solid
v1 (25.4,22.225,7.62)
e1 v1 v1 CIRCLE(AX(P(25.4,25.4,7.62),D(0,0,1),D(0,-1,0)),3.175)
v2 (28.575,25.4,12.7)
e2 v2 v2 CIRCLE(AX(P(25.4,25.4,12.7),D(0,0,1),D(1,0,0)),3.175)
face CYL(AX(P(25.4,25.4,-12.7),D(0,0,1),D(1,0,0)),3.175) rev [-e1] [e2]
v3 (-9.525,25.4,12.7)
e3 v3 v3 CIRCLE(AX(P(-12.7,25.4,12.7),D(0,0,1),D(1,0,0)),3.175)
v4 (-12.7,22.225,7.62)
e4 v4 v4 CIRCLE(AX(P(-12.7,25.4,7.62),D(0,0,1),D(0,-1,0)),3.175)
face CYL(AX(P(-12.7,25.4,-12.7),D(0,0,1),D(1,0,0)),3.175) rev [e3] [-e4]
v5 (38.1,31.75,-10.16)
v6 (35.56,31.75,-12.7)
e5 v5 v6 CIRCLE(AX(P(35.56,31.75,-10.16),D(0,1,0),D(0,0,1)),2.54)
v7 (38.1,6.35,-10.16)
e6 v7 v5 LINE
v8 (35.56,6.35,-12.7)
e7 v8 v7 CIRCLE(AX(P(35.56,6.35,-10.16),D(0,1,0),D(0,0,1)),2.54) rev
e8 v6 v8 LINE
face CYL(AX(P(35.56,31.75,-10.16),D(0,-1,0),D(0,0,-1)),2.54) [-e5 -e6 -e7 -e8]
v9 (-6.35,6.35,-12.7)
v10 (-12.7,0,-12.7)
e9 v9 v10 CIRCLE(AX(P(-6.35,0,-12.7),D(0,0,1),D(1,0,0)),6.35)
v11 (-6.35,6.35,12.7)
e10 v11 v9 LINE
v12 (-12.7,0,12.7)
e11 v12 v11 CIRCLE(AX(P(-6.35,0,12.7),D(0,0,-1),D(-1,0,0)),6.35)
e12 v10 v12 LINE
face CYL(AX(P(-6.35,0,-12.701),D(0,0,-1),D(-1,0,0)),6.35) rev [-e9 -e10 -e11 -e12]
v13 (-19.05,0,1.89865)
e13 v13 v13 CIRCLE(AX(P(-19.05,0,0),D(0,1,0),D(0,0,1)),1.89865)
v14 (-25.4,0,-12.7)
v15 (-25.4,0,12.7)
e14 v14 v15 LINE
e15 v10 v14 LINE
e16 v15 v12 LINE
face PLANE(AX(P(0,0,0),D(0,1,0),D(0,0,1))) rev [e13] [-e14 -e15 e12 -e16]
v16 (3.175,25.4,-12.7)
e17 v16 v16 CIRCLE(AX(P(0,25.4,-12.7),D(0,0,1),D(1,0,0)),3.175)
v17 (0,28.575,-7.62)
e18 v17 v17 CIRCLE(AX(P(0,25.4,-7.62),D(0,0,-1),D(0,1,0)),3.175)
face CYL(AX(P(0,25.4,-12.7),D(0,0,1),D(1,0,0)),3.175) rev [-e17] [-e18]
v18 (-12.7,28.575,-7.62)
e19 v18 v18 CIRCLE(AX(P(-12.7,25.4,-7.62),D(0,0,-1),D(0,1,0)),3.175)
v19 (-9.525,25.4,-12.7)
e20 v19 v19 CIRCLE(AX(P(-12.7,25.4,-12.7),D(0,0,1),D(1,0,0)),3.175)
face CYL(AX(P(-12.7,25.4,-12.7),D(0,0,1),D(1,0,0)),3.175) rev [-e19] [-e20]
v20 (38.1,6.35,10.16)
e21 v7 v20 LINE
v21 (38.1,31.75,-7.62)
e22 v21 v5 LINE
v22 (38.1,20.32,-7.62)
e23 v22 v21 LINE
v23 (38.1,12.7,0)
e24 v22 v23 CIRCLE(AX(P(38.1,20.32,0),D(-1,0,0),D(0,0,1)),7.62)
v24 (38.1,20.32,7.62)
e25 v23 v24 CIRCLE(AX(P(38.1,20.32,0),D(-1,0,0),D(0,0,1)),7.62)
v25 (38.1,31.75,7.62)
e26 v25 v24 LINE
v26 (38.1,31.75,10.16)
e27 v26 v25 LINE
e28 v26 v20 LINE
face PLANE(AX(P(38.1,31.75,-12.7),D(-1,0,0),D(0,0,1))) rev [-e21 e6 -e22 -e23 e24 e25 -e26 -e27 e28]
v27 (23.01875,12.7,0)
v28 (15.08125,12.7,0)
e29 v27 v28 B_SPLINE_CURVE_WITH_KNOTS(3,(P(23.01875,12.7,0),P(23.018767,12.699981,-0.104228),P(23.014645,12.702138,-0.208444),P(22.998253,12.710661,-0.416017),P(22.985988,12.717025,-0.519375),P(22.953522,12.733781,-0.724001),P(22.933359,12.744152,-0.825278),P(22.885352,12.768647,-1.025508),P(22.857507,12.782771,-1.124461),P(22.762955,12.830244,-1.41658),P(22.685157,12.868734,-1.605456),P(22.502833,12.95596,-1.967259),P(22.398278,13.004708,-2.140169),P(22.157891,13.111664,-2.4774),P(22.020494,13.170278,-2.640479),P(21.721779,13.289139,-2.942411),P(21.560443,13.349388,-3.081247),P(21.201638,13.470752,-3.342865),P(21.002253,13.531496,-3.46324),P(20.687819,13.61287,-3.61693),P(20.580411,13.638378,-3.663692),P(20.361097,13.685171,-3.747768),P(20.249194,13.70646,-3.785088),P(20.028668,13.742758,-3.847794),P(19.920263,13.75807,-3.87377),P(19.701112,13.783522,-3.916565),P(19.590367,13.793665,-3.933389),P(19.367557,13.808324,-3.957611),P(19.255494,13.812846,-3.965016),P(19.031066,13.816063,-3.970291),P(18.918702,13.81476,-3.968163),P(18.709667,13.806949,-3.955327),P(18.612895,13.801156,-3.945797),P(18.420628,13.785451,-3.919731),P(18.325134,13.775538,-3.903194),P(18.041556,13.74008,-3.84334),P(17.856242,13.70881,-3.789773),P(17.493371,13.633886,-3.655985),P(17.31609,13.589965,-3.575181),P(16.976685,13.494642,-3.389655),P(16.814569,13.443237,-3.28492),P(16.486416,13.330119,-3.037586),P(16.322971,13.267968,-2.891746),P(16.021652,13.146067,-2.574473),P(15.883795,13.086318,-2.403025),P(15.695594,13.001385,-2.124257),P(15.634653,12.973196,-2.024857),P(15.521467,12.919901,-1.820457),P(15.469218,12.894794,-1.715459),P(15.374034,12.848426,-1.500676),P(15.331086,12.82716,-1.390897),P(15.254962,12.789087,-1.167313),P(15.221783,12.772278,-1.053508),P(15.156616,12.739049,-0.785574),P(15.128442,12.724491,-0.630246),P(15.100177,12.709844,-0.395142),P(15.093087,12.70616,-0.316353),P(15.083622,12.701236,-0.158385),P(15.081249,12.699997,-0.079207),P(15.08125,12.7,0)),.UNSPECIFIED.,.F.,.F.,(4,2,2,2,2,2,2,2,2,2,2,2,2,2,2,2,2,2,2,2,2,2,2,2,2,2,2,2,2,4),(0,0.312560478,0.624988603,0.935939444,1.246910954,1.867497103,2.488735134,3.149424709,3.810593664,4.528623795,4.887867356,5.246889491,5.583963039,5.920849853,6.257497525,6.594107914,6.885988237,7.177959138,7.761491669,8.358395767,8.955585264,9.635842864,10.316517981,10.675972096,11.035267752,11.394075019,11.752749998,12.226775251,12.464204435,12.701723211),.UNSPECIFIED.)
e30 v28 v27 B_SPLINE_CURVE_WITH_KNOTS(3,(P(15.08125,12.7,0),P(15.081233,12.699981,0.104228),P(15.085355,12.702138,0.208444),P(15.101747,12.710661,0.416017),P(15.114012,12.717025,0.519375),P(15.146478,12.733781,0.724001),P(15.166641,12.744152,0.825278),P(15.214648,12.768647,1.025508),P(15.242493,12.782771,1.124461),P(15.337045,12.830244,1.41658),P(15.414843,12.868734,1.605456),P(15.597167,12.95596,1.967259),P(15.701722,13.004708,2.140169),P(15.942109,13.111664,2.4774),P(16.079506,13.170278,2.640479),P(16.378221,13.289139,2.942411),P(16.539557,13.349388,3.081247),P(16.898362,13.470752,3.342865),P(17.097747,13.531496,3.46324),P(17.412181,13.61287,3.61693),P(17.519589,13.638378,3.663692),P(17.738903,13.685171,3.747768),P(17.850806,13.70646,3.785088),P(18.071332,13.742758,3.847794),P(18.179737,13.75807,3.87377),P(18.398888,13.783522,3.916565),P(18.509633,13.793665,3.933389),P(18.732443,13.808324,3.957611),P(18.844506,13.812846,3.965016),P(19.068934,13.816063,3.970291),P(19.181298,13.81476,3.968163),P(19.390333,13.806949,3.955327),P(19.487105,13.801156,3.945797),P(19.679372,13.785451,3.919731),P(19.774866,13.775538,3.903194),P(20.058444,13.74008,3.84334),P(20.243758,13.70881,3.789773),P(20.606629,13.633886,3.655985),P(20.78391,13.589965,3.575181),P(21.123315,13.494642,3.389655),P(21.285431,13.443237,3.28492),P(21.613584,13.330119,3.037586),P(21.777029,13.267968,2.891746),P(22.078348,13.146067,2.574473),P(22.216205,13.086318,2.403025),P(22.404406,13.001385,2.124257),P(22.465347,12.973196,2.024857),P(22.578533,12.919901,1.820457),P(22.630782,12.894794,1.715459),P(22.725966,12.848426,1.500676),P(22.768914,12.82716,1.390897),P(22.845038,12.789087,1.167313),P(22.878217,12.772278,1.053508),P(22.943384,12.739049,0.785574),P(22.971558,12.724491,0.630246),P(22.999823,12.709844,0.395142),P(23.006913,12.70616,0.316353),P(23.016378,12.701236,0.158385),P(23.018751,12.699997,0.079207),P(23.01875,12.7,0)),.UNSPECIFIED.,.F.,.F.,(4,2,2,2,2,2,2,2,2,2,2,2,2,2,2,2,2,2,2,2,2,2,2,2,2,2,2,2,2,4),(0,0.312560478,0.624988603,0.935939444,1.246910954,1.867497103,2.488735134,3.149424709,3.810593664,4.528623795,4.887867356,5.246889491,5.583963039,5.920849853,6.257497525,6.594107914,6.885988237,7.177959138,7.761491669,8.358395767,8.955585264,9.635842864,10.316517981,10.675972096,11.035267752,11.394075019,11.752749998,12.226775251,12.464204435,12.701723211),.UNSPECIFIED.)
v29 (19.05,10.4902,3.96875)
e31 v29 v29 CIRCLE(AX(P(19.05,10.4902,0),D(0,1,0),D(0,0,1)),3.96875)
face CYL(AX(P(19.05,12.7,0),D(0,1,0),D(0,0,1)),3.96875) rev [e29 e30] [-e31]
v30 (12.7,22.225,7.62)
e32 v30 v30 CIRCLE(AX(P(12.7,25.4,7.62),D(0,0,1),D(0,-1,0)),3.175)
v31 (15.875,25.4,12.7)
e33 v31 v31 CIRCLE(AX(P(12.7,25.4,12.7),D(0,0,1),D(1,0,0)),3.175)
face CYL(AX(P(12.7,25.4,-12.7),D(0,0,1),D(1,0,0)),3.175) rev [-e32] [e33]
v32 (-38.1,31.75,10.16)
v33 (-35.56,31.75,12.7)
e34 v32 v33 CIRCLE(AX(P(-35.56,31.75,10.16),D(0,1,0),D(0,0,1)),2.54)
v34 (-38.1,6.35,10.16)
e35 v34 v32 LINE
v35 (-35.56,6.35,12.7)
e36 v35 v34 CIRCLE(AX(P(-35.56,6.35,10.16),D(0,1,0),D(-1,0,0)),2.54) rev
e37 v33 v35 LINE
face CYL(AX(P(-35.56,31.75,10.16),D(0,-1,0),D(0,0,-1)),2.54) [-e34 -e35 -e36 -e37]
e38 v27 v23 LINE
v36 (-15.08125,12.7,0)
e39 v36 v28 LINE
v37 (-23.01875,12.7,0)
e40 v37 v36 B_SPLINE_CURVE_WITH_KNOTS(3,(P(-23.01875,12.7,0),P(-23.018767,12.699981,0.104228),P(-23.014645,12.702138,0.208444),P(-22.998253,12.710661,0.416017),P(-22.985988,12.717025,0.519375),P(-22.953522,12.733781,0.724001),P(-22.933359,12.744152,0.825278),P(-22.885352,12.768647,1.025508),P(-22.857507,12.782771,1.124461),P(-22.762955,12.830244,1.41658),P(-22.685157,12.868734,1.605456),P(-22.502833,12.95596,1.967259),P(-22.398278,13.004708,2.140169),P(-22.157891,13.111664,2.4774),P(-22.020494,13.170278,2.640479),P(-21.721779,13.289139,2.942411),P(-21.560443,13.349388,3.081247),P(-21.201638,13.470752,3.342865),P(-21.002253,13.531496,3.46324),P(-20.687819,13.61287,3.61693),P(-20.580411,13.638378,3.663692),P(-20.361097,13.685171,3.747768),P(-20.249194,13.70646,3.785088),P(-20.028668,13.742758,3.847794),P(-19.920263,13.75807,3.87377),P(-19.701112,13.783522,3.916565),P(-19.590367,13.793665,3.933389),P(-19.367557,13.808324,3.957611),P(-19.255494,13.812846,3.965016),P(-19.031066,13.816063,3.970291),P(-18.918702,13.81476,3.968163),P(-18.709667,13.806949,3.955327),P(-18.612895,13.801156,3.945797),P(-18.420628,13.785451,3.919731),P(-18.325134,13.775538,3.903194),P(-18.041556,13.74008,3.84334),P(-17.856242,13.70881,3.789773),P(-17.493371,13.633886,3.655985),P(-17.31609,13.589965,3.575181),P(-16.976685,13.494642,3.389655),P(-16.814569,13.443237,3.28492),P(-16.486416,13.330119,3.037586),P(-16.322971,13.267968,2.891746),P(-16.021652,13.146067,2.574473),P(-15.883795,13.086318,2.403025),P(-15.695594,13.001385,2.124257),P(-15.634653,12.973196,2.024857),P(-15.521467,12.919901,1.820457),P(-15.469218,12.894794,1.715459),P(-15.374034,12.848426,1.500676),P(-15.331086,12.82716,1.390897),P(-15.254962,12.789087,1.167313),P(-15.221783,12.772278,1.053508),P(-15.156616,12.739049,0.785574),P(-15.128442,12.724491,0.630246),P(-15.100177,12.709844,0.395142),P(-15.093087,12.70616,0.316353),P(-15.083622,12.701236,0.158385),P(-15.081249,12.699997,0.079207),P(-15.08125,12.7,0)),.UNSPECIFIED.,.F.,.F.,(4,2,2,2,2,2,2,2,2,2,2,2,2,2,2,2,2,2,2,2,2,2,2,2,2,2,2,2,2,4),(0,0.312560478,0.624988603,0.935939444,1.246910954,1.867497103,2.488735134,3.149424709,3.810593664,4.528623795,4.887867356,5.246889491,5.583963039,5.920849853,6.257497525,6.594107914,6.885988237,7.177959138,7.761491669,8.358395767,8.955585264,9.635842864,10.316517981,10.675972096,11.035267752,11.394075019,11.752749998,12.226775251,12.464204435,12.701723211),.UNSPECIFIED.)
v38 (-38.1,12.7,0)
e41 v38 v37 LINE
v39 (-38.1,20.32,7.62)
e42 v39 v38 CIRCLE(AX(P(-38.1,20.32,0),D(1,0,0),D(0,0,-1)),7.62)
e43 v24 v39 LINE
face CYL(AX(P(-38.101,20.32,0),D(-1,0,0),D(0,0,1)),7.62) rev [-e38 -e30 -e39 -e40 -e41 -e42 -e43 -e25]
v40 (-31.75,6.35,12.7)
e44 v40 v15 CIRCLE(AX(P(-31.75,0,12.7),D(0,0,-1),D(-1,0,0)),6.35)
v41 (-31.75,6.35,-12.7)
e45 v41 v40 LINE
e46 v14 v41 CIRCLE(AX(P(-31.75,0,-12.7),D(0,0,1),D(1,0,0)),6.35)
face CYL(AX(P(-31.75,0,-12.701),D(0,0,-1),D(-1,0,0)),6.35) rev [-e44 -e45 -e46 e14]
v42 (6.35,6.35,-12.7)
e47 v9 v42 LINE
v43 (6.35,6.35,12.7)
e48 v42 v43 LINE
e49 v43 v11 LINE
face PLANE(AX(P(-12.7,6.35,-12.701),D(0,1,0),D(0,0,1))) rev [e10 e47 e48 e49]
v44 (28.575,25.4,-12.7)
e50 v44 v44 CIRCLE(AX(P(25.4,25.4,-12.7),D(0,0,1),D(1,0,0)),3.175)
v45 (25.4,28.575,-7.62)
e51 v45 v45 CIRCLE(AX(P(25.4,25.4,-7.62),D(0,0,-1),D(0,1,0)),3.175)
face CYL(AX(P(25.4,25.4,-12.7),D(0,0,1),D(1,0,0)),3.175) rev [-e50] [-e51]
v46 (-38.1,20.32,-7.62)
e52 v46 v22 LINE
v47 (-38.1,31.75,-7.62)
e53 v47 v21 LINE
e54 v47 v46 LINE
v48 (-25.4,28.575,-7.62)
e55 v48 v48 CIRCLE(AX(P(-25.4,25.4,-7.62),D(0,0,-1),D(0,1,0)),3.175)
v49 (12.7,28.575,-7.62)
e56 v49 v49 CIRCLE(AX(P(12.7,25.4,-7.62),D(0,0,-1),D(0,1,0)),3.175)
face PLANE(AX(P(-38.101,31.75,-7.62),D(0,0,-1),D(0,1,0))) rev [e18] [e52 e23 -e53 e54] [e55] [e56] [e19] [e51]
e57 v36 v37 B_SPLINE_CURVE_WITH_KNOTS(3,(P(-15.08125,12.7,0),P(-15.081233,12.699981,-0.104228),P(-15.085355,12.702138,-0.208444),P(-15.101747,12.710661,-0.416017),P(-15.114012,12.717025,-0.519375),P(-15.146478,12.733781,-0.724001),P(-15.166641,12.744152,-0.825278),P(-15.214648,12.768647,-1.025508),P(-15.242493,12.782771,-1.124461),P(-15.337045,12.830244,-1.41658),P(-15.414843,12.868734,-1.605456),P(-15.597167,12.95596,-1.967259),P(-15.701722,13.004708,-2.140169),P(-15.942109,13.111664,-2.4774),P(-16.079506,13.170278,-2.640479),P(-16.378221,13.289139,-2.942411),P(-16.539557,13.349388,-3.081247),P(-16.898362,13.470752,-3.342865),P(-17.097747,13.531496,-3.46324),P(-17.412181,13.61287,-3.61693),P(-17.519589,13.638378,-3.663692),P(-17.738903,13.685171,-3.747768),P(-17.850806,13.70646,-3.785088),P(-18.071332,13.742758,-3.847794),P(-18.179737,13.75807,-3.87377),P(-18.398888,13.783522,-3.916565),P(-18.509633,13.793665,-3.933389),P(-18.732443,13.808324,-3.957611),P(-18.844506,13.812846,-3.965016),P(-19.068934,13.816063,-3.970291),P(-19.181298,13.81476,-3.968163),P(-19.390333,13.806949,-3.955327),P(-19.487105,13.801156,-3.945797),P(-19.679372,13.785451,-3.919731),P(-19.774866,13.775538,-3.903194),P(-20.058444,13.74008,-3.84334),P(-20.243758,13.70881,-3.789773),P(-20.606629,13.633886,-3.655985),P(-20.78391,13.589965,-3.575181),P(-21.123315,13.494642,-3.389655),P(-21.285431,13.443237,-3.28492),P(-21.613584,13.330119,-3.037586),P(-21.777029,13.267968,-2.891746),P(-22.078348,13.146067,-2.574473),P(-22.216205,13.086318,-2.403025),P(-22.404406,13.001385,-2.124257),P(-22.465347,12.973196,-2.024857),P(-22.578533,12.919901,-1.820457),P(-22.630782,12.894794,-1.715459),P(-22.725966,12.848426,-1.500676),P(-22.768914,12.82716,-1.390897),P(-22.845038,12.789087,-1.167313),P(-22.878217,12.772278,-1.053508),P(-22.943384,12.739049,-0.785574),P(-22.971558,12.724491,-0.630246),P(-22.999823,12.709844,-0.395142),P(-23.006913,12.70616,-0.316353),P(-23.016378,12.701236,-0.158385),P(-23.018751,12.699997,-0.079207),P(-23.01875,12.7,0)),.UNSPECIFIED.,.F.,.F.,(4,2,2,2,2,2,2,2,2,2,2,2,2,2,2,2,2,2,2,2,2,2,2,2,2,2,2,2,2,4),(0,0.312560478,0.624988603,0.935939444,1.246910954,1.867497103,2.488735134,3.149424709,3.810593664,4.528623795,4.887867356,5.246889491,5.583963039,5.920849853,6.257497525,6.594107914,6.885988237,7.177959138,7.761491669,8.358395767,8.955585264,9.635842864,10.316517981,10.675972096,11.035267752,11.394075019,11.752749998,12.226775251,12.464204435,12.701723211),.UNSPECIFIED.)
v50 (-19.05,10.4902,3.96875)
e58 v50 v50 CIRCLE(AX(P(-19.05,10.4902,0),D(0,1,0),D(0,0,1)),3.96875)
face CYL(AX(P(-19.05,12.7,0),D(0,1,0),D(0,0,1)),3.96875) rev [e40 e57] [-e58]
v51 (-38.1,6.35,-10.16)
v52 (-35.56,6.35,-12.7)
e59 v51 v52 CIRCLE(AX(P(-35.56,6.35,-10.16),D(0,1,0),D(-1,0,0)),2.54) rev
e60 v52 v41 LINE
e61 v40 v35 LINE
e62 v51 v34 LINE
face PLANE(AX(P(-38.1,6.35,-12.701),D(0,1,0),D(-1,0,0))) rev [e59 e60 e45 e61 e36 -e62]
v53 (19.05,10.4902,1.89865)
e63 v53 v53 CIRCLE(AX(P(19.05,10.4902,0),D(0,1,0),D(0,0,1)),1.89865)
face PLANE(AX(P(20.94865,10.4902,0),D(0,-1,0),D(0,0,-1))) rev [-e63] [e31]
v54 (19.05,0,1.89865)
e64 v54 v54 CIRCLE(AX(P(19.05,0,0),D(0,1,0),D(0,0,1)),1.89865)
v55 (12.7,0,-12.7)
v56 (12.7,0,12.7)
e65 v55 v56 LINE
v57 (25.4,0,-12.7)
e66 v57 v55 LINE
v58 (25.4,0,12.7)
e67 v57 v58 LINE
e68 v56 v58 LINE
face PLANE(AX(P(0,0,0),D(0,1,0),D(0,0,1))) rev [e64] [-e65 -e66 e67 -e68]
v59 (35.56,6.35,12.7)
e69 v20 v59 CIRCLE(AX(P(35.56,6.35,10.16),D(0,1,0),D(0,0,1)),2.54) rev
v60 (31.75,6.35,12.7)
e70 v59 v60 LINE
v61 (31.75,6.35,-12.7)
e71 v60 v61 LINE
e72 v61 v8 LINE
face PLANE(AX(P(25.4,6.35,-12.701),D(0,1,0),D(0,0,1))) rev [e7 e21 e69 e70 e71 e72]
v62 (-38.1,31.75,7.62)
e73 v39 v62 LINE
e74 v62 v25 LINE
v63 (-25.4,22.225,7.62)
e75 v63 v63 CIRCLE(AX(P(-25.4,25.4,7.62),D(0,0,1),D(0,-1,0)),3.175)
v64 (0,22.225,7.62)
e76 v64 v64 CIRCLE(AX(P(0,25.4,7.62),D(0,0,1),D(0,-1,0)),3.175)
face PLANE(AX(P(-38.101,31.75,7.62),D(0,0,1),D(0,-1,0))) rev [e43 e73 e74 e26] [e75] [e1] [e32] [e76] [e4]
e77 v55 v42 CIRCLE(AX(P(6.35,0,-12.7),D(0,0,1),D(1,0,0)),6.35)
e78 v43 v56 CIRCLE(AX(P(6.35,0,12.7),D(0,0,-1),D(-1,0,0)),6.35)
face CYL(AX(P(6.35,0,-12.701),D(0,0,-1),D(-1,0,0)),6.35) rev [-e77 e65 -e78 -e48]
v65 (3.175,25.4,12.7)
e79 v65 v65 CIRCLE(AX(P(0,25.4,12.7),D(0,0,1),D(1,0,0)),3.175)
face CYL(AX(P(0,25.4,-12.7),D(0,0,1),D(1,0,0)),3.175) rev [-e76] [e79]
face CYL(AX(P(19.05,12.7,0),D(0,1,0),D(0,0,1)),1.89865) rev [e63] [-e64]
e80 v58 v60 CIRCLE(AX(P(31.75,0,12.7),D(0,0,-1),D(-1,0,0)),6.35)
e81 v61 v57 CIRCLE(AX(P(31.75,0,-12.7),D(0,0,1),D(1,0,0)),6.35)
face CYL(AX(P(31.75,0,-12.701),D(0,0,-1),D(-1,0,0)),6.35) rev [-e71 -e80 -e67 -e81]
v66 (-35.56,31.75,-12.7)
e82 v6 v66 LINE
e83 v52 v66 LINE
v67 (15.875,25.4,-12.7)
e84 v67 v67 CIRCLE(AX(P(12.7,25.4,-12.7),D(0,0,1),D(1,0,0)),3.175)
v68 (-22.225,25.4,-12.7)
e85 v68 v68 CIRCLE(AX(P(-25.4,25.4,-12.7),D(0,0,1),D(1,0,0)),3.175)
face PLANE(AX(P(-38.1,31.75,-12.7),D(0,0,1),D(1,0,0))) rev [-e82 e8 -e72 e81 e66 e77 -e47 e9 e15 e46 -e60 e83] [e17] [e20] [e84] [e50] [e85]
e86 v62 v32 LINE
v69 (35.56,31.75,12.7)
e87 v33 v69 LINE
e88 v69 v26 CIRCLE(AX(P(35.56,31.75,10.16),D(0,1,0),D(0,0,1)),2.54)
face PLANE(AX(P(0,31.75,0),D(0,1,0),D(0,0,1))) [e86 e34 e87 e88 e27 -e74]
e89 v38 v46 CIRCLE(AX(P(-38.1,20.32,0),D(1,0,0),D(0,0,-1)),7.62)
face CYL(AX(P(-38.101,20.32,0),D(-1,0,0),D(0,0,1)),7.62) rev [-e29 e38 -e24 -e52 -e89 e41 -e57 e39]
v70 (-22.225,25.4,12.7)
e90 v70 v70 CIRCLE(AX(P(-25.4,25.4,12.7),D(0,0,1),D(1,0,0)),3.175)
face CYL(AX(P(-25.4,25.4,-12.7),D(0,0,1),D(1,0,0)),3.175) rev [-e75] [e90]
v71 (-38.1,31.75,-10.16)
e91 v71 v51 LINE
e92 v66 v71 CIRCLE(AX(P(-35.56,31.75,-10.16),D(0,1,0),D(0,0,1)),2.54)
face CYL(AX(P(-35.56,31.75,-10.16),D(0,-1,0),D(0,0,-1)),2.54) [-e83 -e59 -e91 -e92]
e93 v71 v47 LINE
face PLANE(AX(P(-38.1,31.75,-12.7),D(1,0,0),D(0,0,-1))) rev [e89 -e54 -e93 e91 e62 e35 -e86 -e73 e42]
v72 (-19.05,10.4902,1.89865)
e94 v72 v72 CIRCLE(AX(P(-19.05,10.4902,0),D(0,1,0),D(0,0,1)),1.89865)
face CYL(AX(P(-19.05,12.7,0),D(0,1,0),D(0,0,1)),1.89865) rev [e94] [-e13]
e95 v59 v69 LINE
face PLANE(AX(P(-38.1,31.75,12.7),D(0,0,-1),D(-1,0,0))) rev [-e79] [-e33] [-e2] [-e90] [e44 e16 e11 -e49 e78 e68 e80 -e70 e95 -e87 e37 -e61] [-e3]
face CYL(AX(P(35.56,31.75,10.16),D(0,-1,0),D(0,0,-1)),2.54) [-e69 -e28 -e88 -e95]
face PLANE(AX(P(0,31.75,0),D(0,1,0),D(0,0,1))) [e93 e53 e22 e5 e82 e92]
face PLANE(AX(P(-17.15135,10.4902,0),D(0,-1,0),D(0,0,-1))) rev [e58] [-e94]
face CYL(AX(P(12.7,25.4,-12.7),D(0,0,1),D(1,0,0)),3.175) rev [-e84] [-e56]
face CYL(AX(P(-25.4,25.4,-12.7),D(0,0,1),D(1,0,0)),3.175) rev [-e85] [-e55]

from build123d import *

# Parameters (mm, degrees)
SKETCH1_W                                           = 76.2
SKETCH1_H                                           = 25.4
BOSS_EXTRUDE1_DEPTH                                 = 31.75
CUT_EXTRUDE1_REACH                                  = 85.521
SKETCH2_W                                           = 15.24
SKETCH2_H                                           = 19.05
SKETCH3_R                                           = 3.175
CUT_EXTRUDE2_DEPTH                                  = 56.72102386
LPATTERN1_COUNT                                     = 5
LPATTERN1_PITCH                                     = 12.7
CBORE_FOR_6_BINDING_HEAD_MACHINE_SCREW1_D           = 3.7973
CBORE_FOR_6_BINDING_HEAD_MACHINE_SCREW1_CBORE_D     = 7.9375
CBORE_FOR_6_BINDING_HEAD_MACHINE_SCREW1_CBORE_DEPTH = 2.2098
FILLET2_R                                           = 7.62
CUT_EXTRUDE3_REACH                                  = 57.721
SKETCH7_W                                           = 12.7
SKETCH7_H                                           = 6.35
SKETCH7_W_2                                         = 25.4
FILLET5_R                                           = 6.35
FILLET6_R                                           = 2.54


# Some blends are built 0.0001 mm under size
with BuildPart() as part:
    # Sketch1 → Boss-Extrude1 (new body)
    with BuildSketch(Plane(origin=(0, 0, 0), x_dir=(1, 0, 0), z_dir=(0, 1, 0))):
        Rectangle(SKETCH1_W, SKETCH1_H)
    extrude(amount=BOSS_EXTRUDE1_DEPTH)

    # Sketch2 → Cut-Extrude1 (cut, up to next)
    with BuildSketch(Plane(origin=(38.1, 0, 0), x_dir=(0, 0, -1), z_dir=(1, 0, 0)), mode=Mode.PRIVATE) as cut_extrude1_sk1:
        with Locations((0, 22.225)):
            Rectangle(SKETCH2_W, SKETCH2_H)
    cut_extrude1_tool1 = extrude(cut_extrude1_sk1.sketch, amount=-CUT_EXTRUDE1_REACH, mode=Mode.PRIVATE) & part.part
    add(cut_extrude1_tool1.solids().sort_by_distance((38.1, 22.225, 0))[0], mode=Mode.SUBTRACT)

    # Sketch3 → Cut-Extrude2 (cut, through all)
    with BuildSketch(Plane.XY.offset(12.7)):
        with Locations((-25.4, 25.4)):
            Circle(SKETCH3_R)
    cut_extrude2 = extrude(amount=-CUT_EXTRUDE2_DEPTH, mode=Mode.SUBTRACT)

    # LPattern1: Cut-Extrude2 ×5
    with Locations(*[(i * LPATTERN1_PITCH, 0, 0) for i in range(1, LPATTERN1_COUNT)]):
        add(cut_extrude2, mode=Mode.SUBTRACT)

    # CBORE for #6 Binding Head Machine Screw1 (through all)
    with Locations(Plane(origin=(0, 12.7, 0), x_dir=(1, 0, 0), z_dir=(0, 1, 0))):
        with Locations((-19.05, 0), (19.05, 0)):
            CounterBoreHole(CBORE_FOR_6_BINDING_HEAD_MACHINE_SCREW1_D / 2, CBORE_FOR_6_BINDING_HEAD_MACHINE_SCREW1_CBORE_D / 2, CBORE_FOR_6_BINDING_HEAD_MACHINE_SCREW1_CBORE_DEPTH)

    # Fillet2
    # the kernel refuses this fillet: 7.62 mm, written as the material it adds along each edge
    with BuildSketch(Plane(origin=(38.1, 12.7, -7.62), x_dir=(0, 1, 0), z_dir=(-1, 0, 0))) as fillet2_piece_1_section:
        with BuildLine():
            CenterArc((FILLET2_R, -FILLET2_R), FILLET2_R, 90, 90)
            Line((0, -FILLET2_R), (0, 0))
            Line((0, 0), (FILLET2_R, 0))
        make_face()
    fillet2_piece_1 = extrude(amount=76.2, mode=Mode.PRIVATE)
    fillet2_piece_1 = fillet2_piece_1 - Plane(origin=(-19.05, 14.454782772, 0), x_dir=(1, 0, 0), z_dir=(0, 1, 0)) * Cylinder(3.96875, 183, mode=Mode.PRIVATE)
    fillet2_piece_1 = fillet2_piece_1 - Plane(origin=(19.05, 14.454782772, 0), x_dir=(1, 0, 0), z_dir=(0, 1, 0)) * Cylinder(3.96875, 183, mode=Mode.PRIVATE)
    add(fillet2_piece_1)
    with BuildSketch(Plane(origin=(38.1, 12.7, 7.62), x_dir=(0, 0, -1), z_dir=(-1, 0, 0))) as fillet2_piece_2_section:
        with BuildLine():
            CenterArc((FILLET2_R, -FILLET2_R), FILLET2_R, 90, 90)
            Line((0, -FILLET2_R), (0, 0))
            Line((0, 0), (FILLET2_R, 0))
        make_face()
    fillet2_piece_2 = extrude(amount=76.2, mode=Mode.PRIVATE)
    fillet2_piece_2 = fillet2_piece_2 - Plane(origin=(-19.05, 14.454782936, 0), x_dir=(1, 0, 0), z_dir=(0, 1, 0)) * Cylinder(3.96875, 183, mode=Mode.PRIVATE)
    fillet2_piece_2 = fillet2_piece_2 - Plane(origin=(19.05, 14.454782936, 0), x_dir=(1, 0, 0), z_dir=(0, 1, 0)) * Cylinder(3.96875, 183, mode=Mode.PRIVATE)
    add(fillet2_piece_2)

    # Sketch7 → Cut-Extrude3 (cut, up to next)
    with BuildSketch(Plane.XY.offset(12.7), mode=Mode.PRIVATE) as cut_extrude3_sk1:
        with Locations((-31.75, 3.175)):
            Rectangle(SKETCH7_W, SKETCH7_H)
    cut_extrude3_tool1 = extrude(cut_extrude3_sk1.sketch, amount=-CUT_EXTRUDE3_REACH, mode=Mode.PRIVATE) & part.part
    # Sketch7 → Cut-Extrude3 (cut, up to next)
    with BuildSketch(Plane.XY.offset(12.7), mode=Mode.PRIVATE) as cut_extrude3_sk2:
        with Locations((31.75, 3.175)):
            Rectangle(SKETCH7_W, SKETCH7_H)
    cut_extrude3_tool2 = extrude(cut_extrude3_sk2.sketch, amount=-CUT_EXTRUDE3_REACH, mode=Mode.PRIVATE) & part.part
    # Sketch7 → Cut-Extrude3 (cut, up to next)
    with BuildSketch(Plane.XY.offset(12.7), mode=Mode.PRIVATE) as cut_extrude3_sk3:
        with Locations((0, 3.175)):
            Rectangle(SKETCH7_W_2, SKETCH7_H)
    cut_extrude3_tool3 = extrude(cut_extrude3_sk3.sketch, amount=-CUT_EXTRUDE3_REACH, mode=Mode.PRIVATE) & part.part
    add(cut_extrude3_tool1.solids().sort_by_distance((-31.75, 3.175, 12.7))[0], mode=Mode.SUBTRACT)
    add(cut_extrude3_tool2.solids().sort_by_distance((31.75, 3.175, 12.7))[0], mode=Mode.SUBTRACT)
    add(cut_extrude3_tool3.solids().sort_by_distance((0, 3.175, 12.7))[0], mode=Mode.SUBTRACT)

    # Fillet5
    fillet5_edges = [part.edges().sort_by_distance(p)[0] for p in [
        (-25.4, 6.35, 0),
        (-12.7, 6.35, 0),
        (12.7, 6.35, 0),
        (25.4, 6.35, 0),
    ]]
    fillet(fillet5_edges, radius=FILLET5_R - 0.0001)  # a hair under: the kernel refuses the full size

    # Fillet6
    fillet6_edges = [part.edges().sort_by_distance(p)[0] for p in [
        (-38.1, 19.05, -12.7),
        (38.1, 19.05, -12.7),
        (38.1, 19.05, 12.7),
        (-38.1, 19.05, 12.7),
    ]]
    fillet(fillet6_edges, radius=FILLET6_R)


solid = part.part
